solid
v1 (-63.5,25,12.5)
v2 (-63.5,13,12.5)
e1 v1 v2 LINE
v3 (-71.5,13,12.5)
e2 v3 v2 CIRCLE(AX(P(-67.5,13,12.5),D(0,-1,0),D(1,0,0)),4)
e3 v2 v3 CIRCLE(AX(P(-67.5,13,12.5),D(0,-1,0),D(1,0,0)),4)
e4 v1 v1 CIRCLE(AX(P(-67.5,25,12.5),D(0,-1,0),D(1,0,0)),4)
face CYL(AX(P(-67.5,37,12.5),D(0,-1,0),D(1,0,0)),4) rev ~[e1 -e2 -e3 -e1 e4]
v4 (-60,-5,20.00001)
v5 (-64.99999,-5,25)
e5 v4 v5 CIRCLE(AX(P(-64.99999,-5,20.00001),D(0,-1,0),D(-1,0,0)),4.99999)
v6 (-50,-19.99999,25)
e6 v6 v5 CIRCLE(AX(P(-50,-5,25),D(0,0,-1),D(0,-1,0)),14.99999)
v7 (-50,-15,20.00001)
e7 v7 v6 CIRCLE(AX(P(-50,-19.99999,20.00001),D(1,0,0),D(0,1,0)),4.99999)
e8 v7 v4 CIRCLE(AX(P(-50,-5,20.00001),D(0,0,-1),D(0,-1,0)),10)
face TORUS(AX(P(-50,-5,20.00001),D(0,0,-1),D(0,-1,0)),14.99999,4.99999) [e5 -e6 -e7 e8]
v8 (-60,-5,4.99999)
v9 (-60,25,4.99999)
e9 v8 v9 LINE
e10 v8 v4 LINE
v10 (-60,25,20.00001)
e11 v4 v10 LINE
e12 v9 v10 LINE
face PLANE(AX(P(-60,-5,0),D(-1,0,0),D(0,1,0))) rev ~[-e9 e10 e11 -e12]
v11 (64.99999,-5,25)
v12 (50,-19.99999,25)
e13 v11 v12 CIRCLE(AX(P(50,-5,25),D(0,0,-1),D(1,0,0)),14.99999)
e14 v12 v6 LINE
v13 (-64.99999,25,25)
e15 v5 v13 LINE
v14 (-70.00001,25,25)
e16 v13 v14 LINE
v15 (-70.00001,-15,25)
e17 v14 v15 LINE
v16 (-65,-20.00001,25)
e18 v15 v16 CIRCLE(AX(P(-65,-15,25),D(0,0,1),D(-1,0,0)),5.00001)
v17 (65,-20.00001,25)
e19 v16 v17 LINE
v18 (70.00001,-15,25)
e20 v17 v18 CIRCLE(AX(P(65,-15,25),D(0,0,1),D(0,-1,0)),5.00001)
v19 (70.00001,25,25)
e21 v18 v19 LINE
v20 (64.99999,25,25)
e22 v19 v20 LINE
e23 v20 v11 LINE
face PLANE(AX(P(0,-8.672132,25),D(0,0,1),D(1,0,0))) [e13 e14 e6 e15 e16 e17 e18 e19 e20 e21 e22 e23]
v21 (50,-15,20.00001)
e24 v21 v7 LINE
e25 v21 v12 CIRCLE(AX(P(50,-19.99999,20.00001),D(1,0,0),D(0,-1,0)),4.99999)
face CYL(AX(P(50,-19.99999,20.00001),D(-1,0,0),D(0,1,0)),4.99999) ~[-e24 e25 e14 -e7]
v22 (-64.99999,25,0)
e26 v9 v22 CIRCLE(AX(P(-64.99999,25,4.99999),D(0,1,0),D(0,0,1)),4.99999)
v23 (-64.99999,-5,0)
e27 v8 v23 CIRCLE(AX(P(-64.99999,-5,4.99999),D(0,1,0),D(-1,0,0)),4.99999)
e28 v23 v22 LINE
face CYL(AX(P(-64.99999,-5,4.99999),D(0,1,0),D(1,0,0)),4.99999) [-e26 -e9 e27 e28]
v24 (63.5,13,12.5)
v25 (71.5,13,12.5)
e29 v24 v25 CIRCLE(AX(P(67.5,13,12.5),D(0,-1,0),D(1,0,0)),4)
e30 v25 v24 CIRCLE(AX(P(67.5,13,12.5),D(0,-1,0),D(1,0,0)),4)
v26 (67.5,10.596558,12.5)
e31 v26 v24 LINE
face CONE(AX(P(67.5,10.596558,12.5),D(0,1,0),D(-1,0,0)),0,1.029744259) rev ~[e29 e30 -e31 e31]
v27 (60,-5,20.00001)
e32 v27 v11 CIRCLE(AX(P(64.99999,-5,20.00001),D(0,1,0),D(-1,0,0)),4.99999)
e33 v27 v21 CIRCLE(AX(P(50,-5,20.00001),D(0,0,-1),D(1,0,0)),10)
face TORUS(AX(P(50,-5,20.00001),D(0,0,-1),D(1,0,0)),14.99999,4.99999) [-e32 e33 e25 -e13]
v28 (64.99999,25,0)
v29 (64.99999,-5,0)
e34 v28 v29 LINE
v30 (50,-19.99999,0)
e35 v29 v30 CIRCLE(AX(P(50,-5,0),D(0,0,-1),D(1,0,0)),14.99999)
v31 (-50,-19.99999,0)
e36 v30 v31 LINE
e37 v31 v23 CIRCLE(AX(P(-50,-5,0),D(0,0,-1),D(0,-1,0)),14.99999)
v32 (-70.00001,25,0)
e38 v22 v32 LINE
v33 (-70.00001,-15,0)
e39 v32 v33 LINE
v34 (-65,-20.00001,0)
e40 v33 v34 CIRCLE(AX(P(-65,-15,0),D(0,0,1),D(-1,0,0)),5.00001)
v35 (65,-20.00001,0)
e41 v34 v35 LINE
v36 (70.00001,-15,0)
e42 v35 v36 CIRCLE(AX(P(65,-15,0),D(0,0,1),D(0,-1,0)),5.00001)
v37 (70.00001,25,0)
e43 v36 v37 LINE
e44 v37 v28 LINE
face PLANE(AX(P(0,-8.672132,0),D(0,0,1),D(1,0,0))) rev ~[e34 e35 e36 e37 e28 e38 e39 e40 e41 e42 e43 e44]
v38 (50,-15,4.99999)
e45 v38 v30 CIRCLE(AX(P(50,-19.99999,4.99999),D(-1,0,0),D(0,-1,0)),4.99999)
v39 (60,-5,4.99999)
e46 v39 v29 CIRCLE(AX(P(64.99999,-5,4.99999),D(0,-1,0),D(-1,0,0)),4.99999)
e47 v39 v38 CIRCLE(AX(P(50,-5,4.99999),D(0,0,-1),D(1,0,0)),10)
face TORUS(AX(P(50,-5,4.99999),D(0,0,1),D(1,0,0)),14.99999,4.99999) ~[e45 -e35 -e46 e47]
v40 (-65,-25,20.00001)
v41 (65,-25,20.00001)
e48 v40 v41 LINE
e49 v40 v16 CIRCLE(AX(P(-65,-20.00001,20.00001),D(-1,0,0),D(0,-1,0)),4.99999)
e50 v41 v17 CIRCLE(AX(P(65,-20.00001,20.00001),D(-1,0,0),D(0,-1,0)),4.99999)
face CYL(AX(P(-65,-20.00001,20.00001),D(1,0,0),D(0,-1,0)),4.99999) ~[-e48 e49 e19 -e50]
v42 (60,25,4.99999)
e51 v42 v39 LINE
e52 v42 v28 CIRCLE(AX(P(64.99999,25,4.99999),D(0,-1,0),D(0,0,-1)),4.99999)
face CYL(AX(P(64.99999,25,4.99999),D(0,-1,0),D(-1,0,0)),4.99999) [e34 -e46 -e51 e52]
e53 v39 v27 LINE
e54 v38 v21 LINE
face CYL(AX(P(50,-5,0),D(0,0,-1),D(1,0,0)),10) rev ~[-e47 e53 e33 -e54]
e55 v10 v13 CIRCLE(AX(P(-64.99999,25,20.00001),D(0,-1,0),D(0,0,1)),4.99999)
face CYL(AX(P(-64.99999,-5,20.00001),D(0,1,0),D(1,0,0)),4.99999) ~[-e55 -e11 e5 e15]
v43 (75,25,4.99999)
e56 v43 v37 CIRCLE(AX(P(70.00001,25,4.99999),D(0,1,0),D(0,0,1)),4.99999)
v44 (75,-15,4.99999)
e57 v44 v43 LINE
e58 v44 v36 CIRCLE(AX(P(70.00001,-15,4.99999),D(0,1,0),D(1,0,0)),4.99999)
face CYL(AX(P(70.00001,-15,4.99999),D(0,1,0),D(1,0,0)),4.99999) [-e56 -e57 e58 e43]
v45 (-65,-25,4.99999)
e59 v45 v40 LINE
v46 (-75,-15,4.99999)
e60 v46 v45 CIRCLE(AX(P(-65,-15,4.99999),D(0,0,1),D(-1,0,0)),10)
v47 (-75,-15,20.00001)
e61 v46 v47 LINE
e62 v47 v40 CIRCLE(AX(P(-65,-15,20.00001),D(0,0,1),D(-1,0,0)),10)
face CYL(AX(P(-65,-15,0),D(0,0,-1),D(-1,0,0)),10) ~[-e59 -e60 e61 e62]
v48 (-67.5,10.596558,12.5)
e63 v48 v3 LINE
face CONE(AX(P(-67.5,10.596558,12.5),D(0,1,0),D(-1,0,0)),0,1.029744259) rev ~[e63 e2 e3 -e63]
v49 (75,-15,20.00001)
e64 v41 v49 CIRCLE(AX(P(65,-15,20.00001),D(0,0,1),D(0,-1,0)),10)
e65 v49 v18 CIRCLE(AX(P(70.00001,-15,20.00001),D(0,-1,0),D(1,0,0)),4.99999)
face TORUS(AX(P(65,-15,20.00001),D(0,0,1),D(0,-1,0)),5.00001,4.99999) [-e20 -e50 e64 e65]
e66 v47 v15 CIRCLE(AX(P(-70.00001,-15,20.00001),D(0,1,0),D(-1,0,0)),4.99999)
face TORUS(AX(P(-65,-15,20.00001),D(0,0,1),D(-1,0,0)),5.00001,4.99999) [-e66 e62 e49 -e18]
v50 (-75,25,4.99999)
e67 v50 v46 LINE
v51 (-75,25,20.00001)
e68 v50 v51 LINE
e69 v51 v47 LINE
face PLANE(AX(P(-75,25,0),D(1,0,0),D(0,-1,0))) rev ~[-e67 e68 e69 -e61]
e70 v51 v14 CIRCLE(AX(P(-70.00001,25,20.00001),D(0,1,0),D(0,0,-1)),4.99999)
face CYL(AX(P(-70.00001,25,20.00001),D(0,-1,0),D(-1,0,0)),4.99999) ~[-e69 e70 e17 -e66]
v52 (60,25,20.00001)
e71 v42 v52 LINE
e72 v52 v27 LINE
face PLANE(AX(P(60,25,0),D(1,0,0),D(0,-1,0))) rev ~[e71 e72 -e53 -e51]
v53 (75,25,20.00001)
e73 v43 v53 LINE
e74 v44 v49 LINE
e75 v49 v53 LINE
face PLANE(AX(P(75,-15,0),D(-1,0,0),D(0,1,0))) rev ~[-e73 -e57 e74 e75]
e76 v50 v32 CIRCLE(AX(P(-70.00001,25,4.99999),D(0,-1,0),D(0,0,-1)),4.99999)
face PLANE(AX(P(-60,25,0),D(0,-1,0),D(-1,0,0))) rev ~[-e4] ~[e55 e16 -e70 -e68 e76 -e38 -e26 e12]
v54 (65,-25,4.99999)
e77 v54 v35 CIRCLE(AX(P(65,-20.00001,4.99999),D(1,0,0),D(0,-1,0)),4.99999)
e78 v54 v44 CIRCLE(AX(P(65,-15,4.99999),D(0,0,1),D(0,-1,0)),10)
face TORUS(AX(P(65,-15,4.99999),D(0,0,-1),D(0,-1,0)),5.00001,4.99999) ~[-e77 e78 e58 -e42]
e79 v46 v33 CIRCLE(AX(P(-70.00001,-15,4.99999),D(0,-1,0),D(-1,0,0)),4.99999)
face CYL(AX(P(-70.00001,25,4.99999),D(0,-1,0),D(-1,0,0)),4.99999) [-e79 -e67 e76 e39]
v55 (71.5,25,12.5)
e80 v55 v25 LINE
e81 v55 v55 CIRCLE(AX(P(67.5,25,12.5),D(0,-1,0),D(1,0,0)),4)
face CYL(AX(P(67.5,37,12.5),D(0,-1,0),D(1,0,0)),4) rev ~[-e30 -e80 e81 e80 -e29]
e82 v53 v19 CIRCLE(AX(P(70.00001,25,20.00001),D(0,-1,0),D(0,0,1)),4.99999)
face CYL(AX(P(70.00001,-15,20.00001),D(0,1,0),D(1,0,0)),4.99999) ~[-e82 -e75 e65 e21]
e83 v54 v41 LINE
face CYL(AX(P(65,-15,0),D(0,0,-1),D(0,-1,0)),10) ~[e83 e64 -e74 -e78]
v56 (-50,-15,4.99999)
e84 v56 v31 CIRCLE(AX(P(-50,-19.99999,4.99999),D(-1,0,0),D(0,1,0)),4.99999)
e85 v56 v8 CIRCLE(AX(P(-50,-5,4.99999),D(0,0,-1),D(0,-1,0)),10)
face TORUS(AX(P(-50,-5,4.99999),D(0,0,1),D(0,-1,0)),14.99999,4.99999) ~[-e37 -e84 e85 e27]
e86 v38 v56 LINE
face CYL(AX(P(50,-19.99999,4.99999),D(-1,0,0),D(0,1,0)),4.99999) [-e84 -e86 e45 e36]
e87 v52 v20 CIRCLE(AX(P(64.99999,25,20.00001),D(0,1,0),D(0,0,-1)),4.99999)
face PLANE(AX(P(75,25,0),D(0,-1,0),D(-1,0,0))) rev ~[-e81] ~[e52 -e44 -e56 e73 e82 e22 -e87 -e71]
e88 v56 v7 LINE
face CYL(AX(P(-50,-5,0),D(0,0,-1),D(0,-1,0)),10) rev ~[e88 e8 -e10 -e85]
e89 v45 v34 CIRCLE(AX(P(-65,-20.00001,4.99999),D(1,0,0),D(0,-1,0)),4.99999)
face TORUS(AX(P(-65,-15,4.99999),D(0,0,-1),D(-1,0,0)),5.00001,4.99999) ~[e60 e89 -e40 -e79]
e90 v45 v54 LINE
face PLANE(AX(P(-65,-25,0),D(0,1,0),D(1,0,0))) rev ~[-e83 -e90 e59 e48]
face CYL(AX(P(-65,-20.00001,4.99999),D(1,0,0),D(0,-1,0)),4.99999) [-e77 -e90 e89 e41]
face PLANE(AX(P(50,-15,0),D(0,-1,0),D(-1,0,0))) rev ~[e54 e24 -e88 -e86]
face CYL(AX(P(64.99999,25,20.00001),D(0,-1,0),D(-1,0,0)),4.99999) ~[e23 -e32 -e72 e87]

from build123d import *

# Parameters (mm, degrees)
F1_DEPTH = 25
F2_R     = 4.99999
F4_D     = 8
F4_DEPTH = 12
F4_TIP   = 2.4034424761
F6_D     = 8
F6_DEPTH = 12
F6_TIP   = 2.4034424761


# Not quite as in the source:
# - a fillet or chamfer is up to 0.001 mm smaller than in the source, because OpenCascade refuses the exact size


with BuildPart() as f1:
    # F0 (on Top) → F1 (new body)
    with BuildSketch(Plane.XY):
        with BuildLine():
            Line((75, -15), (75, 25))
            Line((75, 25), (60, 25))
            Line((60, 25), (60, -5))
            ThreePointArc((60, -5), (57.0710678119, -12.0710678119), (50, -15))
            Line((50, -15), (-50, -15))
            ThreePointArc((-50, -15), (-57.0710678119, -12.0710678119), (-60, -5))
            Line((-60, -5), (-60, 25))
            Line((-60, 25), (-75, 25))
            Line((-75, 25), (-75, -15))
            ThreePointArc((-75, -15), (-72.0710678119, -22.0710678119), (-65, -25))
            Line((-65, -25), (65, -25))
            ThreePointArc((65, -25), (72.0710678119, -22.0710678119), (75, -15))
        make_face()
    extrude(amount=F1_DEPTH)

    # F2 (radius 5 in the source; OpenCascade refuses exactly that, so slightly less here)
    f2_edges = [f1.edges().sort_by_distance(p)[0] for p in [
        (-57.071068, -12.071068, 0),
        (-57.071068, -12.071068, 25),
        (-72.071068, -22.071068, 0),
        (-72.071068, -22.071068, 25),
    ]]
    fillet(f2_edges, radius=F2_R)

    # F4
    with Locations(Plane(origin=(0, 25, 0), x_dir=(-1, 0, 0), z_dir=(0, 1, 0))):
        with Locations((67.5, 12.5)):
            Hole(F4_D / 2, depth=F4_DEPTH)
            with Locations((0, 0, -(F4_DEPTH + F4_TIP / 2))):  # 118° drill point
                Cone(0, F4_D / 2, F4_TIP, mode=Mode.SUBTRACT)

    # F6
    with Locations(Plane(origin=(0, 25, 0), x_dir=(-1, 0, 0), z_dir=(0, 1, 0))):
        with Locations((-67.5, 12.5)):
            Hole(F6_D / 2, depth=F6_DEPTH)
            with Locations((0, 0, -(F6_DEPTH + F6_TIP / 2))):  # 118° drill point
                Cone(0, F6_D / 2, F6_TIP, mode=Mode.SUBTRACT)


solid = f1.part
